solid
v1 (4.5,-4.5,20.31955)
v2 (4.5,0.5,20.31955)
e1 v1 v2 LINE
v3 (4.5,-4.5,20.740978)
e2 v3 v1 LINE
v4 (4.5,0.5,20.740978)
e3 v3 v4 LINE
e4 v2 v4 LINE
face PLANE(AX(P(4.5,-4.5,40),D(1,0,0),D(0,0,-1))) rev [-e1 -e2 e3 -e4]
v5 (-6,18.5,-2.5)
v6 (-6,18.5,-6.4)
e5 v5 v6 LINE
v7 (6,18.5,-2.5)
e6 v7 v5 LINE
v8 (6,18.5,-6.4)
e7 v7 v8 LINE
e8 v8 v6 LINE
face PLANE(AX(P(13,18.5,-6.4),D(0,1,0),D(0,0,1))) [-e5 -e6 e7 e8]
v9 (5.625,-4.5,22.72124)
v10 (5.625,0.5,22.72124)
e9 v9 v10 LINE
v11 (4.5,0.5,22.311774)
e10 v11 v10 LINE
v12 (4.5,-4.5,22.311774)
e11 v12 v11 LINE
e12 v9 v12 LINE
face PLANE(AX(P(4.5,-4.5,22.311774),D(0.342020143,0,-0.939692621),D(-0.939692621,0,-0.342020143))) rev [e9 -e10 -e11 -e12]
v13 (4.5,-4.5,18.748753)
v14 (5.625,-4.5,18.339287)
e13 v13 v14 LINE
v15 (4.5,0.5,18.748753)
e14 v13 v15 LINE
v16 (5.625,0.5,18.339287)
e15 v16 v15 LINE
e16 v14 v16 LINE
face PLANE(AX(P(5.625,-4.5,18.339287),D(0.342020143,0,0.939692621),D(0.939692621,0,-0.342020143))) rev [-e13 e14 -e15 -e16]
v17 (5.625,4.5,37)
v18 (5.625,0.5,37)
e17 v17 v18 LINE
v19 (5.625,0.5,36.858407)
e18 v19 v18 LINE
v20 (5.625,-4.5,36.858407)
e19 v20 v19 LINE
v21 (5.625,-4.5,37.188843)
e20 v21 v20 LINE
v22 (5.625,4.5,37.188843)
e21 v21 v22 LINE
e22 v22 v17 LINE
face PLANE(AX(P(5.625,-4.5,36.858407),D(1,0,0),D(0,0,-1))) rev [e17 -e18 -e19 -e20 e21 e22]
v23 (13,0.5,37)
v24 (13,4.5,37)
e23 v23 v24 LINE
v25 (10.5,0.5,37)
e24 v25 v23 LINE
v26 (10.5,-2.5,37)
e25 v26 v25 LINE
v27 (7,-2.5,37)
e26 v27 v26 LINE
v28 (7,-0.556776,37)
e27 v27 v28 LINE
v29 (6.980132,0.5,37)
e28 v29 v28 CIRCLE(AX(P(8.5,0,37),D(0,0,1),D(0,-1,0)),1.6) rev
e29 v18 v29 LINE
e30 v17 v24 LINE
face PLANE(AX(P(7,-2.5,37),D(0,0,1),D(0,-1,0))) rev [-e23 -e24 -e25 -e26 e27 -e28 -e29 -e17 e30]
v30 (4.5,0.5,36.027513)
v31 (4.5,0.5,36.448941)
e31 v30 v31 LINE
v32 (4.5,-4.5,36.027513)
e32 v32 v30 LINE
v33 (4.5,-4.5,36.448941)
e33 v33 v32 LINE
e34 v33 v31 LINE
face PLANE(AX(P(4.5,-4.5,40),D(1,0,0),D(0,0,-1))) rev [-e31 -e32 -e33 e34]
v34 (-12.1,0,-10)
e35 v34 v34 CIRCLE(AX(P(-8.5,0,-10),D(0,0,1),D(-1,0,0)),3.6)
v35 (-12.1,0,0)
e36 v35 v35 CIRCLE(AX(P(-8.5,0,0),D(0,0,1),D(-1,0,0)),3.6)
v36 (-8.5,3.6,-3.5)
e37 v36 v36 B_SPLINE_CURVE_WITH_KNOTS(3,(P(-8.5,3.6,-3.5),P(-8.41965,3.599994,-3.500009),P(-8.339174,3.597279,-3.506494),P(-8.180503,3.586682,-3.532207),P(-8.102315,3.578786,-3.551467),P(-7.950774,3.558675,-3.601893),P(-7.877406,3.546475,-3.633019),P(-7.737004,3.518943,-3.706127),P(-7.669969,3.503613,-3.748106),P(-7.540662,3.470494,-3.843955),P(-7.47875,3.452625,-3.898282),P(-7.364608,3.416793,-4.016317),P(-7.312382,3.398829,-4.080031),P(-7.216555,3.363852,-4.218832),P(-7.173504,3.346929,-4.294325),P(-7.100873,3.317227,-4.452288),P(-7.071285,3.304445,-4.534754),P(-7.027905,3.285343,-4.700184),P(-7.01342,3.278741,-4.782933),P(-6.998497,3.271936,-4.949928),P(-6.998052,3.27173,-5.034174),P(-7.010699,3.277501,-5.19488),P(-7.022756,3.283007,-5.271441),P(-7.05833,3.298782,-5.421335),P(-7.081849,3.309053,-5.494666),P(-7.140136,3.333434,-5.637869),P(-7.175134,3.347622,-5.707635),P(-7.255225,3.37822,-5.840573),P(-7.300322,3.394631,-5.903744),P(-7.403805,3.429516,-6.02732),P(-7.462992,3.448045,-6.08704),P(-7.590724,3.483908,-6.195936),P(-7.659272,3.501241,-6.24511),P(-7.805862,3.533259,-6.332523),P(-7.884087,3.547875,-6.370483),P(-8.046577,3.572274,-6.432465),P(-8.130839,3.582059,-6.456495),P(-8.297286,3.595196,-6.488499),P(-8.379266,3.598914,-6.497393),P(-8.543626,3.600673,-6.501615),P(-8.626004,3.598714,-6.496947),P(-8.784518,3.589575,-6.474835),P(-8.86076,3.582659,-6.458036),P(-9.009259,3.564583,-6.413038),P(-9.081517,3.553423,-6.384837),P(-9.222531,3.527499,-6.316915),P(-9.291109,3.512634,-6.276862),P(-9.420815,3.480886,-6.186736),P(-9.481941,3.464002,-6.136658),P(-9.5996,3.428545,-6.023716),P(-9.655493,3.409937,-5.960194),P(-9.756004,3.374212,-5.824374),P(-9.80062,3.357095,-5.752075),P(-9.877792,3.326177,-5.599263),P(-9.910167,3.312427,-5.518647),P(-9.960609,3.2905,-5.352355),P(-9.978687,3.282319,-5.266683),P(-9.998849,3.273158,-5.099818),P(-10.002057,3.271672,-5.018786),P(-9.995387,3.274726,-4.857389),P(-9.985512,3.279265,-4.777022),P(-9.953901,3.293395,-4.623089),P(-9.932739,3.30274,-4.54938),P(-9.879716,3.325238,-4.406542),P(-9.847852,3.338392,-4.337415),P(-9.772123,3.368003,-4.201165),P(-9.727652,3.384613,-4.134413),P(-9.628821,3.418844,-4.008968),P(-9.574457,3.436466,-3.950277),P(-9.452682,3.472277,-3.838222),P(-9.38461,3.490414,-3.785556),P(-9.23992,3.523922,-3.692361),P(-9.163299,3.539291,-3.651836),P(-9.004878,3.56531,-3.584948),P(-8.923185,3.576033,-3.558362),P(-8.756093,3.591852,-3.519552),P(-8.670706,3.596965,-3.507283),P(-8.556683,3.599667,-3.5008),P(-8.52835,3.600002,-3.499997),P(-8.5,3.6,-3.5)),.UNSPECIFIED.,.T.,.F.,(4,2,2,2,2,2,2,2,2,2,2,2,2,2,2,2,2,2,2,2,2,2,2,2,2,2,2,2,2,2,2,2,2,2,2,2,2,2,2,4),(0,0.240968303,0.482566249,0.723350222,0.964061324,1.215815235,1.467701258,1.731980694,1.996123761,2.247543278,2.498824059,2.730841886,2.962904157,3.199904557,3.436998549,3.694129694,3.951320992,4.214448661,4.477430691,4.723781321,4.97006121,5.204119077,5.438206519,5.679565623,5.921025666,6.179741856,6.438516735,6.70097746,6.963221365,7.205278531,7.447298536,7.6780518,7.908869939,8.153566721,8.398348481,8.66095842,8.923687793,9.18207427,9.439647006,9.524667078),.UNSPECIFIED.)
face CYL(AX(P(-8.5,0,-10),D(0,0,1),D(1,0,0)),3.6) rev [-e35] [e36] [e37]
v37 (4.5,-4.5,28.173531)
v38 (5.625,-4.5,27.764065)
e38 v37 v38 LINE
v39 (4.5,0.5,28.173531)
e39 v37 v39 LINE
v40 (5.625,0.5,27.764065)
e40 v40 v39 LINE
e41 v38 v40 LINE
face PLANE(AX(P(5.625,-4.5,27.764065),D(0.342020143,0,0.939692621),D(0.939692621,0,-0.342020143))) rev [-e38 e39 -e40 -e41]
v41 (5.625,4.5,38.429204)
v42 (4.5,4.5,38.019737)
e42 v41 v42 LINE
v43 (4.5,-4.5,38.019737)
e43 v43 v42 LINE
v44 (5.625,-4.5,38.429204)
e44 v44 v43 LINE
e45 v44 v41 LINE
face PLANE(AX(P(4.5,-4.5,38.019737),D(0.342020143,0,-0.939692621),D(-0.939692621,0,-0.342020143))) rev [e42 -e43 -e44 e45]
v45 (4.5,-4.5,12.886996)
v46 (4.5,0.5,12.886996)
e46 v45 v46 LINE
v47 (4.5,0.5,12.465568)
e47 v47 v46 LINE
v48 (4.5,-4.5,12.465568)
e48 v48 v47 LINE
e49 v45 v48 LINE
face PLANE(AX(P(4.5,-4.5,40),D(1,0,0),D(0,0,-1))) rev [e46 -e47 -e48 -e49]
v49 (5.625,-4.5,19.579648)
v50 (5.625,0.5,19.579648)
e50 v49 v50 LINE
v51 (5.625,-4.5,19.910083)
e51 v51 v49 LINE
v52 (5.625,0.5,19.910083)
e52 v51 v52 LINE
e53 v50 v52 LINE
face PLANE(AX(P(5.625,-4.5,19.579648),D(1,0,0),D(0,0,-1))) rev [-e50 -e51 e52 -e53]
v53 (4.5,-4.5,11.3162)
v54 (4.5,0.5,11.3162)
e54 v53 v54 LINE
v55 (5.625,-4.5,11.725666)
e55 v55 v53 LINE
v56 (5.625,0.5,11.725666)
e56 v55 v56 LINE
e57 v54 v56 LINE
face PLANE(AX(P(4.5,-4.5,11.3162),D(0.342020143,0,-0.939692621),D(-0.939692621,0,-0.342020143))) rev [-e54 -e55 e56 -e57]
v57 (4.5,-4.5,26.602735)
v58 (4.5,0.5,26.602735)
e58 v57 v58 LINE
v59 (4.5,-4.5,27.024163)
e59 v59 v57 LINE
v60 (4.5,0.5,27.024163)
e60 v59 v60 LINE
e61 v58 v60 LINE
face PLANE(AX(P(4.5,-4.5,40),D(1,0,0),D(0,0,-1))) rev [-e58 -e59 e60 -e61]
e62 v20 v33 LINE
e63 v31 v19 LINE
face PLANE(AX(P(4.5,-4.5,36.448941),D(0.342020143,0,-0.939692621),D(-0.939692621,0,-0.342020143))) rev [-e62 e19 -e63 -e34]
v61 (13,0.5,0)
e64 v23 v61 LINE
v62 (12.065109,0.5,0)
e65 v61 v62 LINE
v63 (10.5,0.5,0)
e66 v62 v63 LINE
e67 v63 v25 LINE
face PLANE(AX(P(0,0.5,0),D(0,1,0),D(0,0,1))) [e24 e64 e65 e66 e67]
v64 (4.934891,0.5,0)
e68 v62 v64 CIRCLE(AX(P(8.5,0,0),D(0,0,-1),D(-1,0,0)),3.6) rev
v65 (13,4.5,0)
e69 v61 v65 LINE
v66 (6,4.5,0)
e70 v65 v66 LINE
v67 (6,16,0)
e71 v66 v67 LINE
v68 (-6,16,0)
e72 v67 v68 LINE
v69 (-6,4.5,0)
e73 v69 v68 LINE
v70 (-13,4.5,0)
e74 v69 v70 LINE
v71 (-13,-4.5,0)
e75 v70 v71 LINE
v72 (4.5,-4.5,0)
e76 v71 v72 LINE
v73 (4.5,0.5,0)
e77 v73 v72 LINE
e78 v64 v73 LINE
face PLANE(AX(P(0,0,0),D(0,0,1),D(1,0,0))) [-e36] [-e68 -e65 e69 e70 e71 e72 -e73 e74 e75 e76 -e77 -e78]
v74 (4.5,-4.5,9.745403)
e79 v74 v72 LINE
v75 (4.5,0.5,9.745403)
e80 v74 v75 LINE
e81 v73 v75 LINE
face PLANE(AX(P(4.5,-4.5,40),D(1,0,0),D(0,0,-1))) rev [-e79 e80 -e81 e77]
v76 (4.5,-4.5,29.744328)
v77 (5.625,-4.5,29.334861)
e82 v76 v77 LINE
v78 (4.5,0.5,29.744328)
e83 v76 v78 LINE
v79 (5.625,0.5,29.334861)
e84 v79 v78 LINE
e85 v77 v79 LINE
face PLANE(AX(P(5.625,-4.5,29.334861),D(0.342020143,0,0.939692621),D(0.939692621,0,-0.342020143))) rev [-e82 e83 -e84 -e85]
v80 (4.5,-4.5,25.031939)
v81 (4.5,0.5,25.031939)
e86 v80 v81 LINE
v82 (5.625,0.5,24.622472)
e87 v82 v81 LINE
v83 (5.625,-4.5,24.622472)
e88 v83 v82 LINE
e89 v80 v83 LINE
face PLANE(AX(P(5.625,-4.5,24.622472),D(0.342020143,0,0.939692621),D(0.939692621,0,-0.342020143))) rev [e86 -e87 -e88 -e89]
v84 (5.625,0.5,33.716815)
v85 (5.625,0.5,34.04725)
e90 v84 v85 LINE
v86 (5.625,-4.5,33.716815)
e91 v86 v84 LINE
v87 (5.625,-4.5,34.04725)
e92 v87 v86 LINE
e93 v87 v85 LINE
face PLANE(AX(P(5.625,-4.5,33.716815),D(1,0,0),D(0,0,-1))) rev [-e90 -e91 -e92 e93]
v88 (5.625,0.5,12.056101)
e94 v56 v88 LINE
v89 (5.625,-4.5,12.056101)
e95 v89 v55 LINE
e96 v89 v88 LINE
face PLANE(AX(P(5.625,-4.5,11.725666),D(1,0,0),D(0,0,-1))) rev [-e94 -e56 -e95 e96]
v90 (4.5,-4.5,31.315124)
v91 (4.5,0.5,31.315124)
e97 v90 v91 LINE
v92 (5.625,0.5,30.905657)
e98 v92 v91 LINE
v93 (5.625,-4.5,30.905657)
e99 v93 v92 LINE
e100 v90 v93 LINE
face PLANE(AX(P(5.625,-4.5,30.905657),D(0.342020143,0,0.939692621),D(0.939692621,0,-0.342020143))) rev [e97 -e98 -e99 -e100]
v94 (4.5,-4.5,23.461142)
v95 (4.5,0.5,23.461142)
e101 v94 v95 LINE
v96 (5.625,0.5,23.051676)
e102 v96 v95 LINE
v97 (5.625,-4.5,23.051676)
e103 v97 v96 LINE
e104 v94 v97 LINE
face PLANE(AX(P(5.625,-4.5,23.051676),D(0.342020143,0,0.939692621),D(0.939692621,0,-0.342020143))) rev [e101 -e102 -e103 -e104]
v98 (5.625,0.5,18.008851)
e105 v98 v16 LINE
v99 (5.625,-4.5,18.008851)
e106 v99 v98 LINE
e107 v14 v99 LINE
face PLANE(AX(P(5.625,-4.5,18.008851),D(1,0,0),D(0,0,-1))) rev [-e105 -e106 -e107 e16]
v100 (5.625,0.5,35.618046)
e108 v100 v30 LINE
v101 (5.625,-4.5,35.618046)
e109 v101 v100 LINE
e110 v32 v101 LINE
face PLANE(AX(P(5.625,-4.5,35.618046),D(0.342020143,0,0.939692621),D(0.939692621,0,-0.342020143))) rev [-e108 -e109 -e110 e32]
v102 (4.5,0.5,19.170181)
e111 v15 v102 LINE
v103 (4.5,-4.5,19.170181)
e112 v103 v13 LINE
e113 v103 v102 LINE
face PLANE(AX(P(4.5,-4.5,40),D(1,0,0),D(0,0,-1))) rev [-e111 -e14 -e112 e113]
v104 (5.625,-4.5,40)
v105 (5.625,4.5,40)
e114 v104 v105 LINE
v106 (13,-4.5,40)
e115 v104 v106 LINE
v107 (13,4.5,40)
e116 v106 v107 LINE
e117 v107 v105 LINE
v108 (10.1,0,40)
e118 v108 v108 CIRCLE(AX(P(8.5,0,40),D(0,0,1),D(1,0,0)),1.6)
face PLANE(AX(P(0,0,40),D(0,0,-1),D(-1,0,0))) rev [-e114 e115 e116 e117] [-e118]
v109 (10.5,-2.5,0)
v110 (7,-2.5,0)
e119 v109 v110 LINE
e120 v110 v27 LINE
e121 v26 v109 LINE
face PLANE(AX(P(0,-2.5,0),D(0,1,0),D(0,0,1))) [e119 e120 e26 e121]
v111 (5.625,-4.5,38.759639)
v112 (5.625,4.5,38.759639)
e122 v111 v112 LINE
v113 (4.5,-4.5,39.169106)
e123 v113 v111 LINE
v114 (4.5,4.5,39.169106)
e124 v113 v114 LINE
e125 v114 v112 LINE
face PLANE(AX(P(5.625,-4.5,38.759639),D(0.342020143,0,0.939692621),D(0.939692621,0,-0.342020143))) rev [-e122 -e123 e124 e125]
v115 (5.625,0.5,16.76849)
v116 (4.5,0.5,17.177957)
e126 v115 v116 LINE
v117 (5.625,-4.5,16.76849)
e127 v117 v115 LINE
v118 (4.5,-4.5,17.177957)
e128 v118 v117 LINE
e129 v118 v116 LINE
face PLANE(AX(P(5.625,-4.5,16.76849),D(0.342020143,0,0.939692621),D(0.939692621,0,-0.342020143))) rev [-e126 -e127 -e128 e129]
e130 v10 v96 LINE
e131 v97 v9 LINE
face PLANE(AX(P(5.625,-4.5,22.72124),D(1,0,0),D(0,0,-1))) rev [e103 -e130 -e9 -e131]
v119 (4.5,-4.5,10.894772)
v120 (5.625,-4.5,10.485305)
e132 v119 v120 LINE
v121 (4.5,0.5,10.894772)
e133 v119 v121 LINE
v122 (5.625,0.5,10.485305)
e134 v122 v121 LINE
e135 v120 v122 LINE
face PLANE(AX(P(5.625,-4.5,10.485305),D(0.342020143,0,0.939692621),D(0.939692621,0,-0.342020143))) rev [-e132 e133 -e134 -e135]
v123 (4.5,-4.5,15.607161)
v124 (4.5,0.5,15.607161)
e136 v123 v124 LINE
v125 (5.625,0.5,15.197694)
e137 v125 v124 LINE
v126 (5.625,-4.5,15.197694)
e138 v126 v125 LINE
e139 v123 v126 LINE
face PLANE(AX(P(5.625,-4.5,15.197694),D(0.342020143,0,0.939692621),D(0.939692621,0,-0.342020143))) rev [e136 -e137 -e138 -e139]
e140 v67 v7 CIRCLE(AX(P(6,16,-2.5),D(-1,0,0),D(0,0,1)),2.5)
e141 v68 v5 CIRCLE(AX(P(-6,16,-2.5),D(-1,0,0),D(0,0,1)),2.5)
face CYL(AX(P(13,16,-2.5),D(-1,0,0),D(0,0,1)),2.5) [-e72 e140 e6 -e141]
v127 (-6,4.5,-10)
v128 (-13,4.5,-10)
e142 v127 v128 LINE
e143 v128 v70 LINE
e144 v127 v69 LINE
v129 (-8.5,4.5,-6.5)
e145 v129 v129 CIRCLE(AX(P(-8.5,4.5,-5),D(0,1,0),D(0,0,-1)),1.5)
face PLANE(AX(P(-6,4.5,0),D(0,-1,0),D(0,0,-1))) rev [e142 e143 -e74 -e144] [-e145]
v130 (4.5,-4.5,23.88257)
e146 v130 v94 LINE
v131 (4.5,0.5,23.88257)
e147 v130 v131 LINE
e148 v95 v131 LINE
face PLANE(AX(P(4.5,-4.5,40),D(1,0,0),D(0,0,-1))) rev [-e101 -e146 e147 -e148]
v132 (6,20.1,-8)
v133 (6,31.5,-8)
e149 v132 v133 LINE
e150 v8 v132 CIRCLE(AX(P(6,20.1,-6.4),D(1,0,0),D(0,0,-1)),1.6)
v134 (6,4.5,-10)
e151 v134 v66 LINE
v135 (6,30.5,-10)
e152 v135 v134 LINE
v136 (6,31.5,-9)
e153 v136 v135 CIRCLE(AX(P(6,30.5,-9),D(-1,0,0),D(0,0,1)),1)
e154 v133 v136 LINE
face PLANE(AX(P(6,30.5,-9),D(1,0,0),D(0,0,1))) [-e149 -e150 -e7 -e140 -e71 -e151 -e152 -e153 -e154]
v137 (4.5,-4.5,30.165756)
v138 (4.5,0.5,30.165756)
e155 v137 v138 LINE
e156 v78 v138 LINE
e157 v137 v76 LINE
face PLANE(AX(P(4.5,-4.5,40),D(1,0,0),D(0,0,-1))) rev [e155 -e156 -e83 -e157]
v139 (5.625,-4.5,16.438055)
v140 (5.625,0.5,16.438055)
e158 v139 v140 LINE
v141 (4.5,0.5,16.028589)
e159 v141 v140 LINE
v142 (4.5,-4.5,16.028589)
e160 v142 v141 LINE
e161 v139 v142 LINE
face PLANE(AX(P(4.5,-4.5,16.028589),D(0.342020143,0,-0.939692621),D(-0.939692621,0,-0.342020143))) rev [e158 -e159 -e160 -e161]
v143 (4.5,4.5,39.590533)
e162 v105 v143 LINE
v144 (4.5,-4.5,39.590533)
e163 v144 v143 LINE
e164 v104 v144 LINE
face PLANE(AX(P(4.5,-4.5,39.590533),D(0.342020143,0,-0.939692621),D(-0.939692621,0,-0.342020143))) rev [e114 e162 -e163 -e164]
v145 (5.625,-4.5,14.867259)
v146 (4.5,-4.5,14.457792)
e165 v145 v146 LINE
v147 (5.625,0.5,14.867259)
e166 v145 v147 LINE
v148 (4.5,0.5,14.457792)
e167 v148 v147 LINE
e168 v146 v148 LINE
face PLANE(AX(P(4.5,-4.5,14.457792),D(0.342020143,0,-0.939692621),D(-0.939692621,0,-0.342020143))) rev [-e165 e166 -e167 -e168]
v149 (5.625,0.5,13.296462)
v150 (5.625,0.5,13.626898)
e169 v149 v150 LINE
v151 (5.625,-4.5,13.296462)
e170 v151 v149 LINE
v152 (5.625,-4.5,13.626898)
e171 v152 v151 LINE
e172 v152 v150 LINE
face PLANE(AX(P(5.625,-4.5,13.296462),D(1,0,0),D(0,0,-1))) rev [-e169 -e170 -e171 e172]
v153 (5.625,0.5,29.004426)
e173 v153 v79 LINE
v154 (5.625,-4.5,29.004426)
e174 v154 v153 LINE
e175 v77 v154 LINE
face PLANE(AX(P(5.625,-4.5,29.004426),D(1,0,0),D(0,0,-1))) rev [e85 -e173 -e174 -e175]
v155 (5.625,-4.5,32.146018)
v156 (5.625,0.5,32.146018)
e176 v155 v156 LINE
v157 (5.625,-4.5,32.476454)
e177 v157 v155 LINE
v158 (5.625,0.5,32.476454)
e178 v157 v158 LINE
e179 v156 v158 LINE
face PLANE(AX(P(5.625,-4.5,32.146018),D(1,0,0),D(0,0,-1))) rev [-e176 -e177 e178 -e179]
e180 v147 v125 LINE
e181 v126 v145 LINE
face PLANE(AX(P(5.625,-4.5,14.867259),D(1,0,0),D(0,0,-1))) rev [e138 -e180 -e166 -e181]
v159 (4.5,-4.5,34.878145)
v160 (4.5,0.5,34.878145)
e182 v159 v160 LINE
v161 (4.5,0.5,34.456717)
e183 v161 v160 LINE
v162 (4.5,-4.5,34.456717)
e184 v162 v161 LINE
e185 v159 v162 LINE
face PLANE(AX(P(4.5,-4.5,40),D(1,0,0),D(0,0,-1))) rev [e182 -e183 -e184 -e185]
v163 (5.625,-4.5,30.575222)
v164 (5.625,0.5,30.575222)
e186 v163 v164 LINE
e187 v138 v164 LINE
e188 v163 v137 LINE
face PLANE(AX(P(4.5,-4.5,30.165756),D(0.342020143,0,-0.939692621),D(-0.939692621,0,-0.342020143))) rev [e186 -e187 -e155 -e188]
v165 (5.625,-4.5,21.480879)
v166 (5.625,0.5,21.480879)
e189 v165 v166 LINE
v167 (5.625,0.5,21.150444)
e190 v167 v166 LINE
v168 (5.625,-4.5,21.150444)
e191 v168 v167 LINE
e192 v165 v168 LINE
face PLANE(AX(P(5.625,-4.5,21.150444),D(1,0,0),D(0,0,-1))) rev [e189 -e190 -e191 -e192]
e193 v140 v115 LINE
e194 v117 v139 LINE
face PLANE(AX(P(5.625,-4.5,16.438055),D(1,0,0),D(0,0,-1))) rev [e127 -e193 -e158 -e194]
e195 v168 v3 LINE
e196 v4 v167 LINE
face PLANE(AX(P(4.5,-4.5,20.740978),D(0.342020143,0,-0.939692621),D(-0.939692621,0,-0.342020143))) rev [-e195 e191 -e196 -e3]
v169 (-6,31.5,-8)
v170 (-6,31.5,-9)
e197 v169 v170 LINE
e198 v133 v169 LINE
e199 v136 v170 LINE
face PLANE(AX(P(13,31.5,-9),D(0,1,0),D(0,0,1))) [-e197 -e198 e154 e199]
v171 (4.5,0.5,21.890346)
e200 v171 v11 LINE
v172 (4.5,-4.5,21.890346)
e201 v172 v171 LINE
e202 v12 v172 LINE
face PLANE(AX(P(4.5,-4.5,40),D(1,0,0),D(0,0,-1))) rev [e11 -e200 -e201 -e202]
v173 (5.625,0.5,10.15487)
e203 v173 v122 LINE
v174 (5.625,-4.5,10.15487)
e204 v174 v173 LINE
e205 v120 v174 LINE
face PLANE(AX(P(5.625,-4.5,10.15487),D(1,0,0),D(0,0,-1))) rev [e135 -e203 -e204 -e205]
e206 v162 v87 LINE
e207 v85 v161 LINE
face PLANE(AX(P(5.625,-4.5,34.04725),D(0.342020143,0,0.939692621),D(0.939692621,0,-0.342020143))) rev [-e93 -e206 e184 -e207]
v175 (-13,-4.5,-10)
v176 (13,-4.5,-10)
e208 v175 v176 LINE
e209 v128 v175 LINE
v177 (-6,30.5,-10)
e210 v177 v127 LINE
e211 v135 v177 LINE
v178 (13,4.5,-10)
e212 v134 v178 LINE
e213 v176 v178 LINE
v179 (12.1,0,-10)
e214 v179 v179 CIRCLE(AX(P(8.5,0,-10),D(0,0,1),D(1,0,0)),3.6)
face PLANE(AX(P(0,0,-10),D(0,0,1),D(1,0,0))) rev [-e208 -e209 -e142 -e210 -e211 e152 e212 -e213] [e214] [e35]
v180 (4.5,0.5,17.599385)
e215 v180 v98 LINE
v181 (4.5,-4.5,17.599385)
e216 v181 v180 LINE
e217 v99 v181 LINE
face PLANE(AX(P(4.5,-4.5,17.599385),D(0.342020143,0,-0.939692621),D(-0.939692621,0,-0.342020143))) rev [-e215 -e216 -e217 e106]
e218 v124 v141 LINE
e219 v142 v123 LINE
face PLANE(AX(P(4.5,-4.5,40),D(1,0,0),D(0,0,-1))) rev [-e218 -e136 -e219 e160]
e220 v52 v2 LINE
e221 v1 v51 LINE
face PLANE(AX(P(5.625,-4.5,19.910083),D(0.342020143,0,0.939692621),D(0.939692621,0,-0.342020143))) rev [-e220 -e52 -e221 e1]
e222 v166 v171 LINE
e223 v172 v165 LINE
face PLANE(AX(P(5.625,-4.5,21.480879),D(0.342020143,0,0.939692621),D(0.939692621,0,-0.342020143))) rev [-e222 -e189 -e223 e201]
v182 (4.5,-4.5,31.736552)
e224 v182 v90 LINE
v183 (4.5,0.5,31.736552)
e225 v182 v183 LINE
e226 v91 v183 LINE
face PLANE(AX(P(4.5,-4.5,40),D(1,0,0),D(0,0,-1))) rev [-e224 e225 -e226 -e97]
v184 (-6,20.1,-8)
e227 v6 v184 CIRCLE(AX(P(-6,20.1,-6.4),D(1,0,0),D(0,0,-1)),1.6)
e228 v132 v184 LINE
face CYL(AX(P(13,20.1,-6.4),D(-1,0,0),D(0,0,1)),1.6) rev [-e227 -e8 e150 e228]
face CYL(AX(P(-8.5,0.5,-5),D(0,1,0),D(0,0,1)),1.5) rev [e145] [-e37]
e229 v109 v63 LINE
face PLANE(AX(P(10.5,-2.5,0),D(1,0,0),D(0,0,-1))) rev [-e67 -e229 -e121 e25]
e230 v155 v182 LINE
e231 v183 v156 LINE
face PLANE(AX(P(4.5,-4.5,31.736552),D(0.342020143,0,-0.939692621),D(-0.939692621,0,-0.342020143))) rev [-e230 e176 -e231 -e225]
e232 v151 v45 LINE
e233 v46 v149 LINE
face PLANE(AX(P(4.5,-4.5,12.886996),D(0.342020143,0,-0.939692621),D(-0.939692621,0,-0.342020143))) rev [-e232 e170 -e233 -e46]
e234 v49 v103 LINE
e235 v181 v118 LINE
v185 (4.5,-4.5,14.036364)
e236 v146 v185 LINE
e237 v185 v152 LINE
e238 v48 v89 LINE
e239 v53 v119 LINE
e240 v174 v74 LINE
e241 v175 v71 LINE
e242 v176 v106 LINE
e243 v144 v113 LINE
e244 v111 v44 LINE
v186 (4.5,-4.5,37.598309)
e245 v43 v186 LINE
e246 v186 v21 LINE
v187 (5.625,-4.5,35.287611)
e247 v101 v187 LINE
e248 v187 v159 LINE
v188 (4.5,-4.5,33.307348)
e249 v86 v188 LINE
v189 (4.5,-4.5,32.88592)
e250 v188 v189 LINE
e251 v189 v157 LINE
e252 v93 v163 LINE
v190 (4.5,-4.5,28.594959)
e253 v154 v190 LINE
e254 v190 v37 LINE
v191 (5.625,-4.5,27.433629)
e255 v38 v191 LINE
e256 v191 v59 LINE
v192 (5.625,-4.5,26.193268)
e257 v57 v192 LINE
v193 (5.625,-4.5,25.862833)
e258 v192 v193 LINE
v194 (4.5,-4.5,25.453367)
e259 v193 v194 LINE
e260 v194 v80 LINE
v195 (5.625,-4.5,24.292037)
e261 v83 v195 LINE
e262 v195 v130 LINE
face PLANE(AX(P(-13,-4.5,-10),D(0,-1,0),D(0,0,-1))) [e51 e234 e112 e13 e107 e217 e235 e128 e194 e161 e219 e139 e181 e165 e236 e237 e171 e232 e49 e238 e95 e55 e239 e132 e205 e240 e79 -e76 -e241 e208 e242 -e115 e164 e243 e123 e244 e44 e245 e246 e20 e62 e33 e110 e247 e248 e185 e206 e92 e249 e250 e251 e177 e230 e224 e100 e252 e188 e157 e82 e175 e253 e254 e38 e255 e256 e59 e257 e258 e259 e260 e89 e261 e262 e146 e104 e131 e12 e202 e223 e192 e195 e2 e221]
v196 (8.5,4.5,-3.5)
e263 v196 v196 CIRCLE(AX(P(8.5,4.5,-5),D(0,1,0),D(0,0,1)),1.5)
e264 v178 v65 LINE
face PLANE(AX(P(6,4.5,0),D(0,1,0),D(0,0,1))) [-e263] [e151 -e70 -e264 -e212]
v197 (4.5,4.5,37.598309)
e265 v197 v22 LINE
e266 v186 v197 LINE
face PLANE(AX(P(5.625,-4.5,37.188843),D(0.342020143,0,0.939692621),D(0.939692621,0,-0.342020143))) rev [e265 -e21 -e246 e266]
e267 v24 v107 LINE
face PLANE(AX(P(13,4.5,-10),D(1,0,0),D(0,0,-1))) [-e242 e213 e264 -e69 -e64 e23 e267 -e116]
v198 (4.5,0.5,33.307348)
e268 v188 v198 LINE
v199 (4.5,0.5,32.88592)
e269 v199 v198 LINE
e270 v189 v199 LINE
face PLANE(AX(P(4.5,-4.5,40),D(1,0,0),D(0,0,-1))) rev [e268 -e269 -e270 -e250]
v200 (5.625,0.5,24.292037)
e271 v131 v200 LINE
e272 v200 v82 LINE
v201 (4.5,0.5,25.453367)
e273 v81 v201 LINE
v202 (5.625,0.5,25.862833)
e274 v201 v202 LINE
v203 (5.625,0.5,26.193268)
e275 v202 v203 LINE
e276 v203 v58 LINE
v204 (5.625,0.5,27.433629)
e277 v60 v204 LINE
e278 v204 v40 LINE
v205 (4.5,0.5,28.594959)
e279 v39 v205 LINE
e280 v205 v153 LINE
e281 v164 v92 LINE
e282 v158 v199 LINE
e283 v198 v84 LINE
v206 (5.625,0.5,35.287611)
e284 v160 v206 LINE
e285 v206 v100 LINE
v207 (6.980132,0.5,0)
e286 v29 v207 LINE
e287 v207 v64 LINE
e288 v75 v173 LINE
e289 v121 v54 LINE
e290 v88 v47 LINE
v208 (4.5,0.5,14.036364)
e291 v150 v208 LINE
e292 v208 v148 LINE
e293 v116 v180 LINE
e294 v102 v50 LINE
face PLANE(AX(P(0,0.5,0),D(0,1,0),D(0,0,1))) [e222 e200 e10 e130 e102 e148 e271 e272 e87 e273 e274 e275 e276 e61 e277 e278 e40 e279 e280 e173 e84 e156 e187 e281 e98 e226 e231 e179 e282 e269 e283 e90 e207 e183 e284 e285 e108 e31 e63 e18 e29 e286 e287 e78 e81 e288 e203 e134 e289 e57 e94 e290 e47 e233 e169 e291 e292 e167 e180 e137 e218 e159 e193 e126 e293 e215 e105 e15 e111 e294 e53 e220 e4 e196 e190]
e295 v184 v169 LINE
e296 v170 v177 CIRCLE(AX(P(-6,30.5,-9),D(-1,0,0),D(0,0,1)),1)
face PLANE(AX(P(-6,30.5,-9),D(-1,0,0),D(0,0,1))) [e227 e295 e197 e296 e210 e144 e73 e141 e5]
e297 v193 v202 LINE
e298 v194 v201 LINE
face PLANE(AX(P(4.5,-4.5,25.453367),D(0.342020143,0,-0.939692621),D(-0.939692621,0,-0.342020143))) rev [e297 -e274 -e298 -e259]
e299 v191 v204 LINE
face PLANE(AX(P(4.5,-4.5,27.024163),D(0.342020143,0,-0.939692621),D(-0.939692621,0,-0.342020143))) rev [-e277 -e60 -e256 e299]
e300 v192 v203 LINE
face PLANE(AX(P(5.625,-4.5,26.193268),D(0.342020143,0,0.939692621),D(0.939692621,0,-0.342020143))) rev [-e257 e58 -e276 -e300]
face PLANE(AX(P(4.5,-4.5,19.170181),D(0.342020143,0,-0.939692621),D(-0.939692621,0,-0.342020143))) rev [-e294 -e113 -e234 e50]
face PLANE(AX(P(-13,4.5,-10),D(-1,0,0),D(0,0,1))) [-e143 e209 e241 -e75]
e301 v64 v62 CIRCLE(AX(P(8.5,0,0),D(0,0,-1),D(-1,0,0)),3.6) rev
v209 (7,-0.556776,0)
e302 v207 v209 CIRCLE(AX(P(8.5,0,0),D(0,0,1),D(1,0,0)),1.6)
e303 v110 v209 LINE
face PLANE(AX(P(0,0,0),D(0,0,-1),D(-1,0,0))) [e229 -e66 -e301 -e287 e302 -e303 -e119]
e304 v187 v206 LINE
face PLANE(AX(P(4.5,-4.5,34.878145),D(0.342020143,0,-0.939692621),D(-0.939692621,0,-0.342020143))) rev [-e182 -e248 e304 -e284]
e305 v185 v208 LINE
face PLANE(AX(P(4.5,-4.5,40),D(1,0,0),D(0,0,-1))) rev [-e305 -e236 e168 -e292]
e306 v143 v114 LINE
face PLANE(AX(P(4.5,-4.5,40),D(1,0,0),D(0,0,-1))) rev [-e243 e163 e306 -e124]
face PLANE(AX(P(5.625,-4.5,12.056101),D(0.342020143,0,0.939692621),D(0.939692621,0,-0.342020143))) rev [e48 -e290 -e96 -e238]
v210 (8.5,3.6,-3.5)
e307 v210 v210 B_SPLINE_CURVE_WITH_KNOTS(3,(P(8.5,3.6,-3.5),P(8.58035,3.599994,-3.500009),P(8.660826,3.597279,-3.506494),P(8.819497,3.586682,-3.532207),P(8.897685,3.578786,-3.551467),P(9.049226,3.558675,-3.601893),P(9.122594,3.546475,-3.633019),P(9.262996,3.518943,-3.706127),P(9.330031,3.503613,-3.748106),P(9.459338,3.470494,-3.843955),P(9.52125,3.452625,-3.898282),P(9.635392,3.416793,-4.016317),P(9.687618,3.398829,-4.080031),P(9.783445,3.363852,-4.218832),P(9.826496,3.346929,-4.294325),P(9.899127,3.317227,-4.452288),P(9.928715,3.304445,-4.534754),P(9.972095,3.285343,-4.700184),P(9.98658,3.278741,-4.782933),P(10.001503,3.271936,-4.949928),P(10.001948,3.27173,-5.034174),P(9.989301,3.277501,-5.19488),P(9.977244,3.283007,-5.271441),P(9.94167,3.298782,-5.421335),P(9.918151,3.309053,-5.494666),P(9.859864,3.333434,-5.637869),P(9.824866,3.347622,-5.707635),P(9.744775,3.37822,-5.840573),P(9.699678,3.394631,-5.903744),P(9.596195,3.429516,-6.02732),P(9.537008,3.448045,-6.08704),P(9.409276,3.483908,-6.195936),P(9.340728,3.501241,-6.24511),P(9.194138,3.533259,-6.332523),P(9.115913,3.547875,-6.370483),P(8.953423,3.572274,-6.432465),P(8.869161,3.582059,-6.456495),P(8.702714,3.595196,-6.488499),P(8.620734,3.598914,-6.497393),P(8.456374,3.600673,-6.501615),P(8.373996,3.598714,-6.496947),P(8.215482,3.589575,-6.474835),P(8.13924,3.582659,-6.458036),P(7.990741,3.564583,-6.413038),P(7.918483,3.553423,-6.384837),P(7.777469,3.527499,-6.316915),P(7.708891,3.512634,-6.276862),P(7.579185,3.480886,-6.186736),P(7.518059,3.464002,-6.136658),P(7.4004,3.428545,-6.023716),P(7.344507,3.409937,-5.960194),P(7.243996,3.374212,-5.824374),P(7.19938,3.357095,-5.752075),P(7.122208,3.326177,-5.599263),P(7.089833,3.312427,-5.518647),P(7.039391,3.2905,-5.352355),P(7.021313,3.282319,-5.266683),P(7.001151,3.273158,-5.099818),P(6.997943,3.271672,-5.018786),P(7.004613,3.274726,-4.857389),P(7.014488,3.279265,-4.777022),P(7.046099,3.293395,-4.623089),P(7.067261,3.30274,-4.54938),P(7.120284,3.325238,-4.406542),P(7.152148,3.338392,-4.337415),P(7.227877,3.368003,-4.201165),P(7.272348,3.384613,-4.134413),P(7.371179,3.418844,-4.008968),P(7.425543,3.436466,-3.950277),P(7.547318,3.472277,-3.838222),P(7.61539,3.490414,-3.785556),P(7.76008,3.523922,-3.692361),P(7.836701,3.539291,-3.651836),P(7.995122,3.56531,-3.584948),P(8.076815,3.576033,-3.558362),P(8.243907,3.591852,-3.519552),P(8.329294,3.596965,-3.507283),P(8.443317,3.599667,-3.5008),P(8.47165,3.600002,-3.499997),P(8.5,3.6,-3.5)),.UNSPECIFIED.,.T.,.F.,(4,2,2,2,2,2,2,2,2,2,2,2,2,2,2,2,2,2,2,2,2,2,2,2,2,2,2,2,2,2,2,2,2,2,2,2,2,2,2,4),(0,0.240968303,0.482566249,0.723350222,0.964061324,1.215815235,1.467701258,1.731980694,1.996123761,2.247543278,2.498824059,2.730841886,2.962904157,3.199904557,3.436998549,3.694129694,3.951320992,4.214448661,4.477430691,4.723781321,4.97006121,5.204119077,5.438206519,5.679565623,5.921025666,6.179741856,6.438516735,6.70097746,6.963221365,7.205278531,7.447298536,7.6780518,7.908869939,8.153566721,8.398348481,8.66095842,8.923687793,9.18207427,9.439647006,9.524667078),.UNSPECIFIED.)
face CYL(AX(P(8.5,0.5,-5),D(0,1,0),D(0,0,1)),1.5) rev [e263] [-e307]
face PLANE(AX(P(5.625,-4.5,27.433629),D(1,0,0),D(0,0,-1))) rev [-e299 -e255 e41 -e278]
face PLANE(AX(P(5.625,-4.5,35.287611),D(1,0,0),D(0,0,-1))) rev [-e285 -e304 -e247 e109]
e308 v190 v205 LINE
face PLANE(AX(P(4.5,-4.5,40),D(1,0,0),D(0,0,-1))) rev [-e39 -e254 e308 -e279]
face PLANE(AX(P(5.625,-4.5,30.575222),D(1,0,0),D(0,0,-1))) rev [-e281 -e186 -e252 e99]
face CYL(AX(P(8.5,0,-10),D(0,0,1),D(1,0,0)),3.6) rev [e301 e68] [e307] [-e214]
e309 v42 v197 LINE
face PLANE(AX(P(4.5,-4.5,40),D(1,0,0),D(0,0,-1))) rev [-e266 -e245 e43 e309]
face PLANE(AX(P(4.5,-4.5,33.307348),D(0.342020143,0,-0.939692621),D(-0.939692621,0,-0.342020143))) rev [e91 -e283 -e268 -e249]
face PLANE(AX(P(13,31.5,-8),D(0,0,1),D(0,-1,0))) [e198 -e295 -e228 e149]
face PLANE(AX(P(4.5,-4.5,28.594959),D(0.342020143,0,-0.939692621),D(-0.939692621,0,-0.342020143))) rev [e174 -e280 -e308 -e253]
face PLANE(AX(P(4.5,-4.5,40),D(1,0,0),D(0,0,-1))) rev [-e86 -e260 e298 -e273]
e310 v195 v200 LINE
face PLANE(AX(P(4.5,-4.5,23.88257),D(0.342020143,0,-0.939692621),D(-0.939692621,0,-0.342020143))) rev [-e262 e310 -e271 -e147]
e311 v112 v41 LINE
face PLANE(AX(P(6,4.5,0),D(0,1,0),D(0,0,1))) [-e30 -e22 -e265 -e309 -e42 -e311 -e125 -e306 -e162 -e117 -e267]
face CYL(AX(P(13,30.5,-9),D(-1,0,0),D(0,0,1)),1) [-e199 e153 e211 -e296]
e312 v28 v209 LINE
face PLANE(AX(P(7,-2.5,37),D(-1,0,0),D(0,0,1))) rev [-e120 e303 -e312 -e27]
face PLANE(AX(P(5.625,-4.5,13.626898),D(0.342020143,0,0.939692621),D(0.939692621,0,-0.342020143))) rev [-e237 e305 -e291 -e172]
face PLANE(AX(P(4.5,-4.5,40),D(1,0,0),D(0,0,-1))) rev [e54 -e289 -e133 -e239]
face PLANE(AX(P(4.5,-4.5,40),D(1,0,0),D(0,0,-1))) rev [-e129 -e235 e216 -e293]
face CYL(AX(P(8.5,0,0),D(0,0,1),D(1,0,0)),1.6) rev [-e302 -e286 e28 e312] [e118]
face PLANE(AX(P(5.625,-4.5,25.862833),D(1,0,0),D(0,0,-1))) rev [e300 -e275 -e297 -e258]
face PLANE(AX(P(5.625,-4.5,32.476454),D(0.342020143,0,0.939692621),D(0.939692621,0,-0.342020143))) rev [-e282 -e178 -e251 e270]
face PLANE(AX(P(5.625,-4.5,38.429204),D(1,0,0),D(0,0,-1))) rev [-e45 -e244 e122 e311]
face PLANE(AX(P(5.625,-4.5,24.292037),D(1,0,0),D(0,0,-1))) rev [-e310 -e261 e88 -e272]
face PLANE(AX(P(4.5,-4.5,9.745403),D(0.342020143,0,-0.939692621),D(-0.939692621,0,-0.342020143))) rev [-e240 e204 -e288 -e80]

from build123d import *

# Parameters (mm, degrees)
SKETCH_1_W             = 26
SKETCH_1_H             = 9
EXTRUDE_1_DEPTH        = 10
SKETCH_2_R             = 3.6
CUT_EXTRUDE_1_DEPTH    = 18.007351352
EXTRUDE_2_DEPTH        = 26
CUT_EXTRUDE_2_DEPTH    = 7
SKETCH_7_W             = 8.5
SKETCH_7_H             = 9
EXTRUDE_3_DEPTH        = 40
SKETCH_8_R             = 1.6
CUT_EXTRUDE_3_DEPTH    = 40
SKETCH_9_W             = 3.5
SKETCH_9_H             = 37
CUT_EXTRUDE_4_DEPTH    = 7
CUT_EXTRUDE_12_DEPTH   = 50.979995998
PATTERN_START          = -4.5
PATTERN_LINEAR_2_DEPTH = 9
SKETCH_22_W            = 8.5
SKETCH_22_H            = 37
CUT_EXTRUDE_13_DEPTH   = 4
SKETCH_23_R            = 1.5
CUT_EXTRUDE_14_DEPTH   = 4


# Read off the part's stored shape, not the designer's step: 阵列(线性)2
with BuildPart() as part:
    # 草图1 → 凸台-拉伸1 (new body)
    with BuildSketch(Plane.XY):
        Rectangle(SKETCH_1_W, SKETCH_1_H)
    extrude(amount=-EXTRUDE_1_DEPTH)

    # 草图2 → 切除-拉伸1 (cut, through all)
    with BuildSketch(Plane.XY):
        with Locations((8.5, 0)):
            Circle(SKETCH_2_R)
        with Locations(Location((-8.5, 0, 0), (0, 0, 180))):
            Circle(SKETCH_2_R)
    extrude(amount=-CUT_EXTRUDE_1_DEPTH, mode=Mode.SUBTRACT)

    # 草图5 → 凸台-拉伸2 (add, through all)
    with BuildSketch(Plane.ZY.offset(13)):
        with BuildLine():
            Line((0, 4.5), (-10, 4.5))
            Line((-10, 4.5), (-10, 8.301419967))
            Line((-10, 8.301419967), (-10, 30.5))
            ThreePointArc((-10, 30.5), (-9.707106781, 31.207106781), (-9, 31.5))
            Line((-9, 31.5), (-8, 31.5))
            Line((-8, 31.5), (-8, 20.1))
            ThreePointArc((-8, 20.1), (-7.53137085, 18.96862915), (-6.4, 18.5))
            Line((-6.4, 18.5), (-2.5, 18.5))
            ThreePointArc((-2.5, 18.5), (-0.732233047, 17.767766953), (0, 16))
            Line((0, 16), (0, 4.5))
        make_face()
    extrude(amount=-EXTRUDE_2_DEPTH)

    # 草图5<2> → 切除-拉伸2 (cut)
    with BuildSketch(Plane.ZY.offset(13)):
        with BuildLine():
            Line((0, 4.5), (-10, 4.5))
            Line((-10, 4.5), (-10, 8.301419967))
            Line((-10, 8.301419967), (-10, 30.5))
            ThreePointArc((-10, 30.5), (-9.707106781, 31.207106781), (-9, 31.5))
            Line((-9, 31.5), (-8, 31.5))
            Line((-8, 31.5), (-8, 20.1))
            ThreePointArc((-8, 20.1), (-7.53137085, 18.96862915), (-6.4, 18.5))
            Line((-6.4, 18.5), (-2.5, 18.5))
            ThreePointArc((-2.5, 18.5), (-0.732233047, 17.767766953), (0, 16))
            Line((0, 16), (0, 4.5))
        make_face()
    cut_extrude_2 = extrude(amount=-CUT_EXTRUDE_2_DEPTH, mode=Mode.SUBTRACT)

    # 镜向1: 切除-拉伸2 across plane
    add(cut_extrude_2.mirror(Plane(origin=(0, 0, 0), x_dir=(0, 0, 1), z_dir=(1, 0, 0))), mode=Mode.SUBTRACT)

    # 草图7 → 凸台-拉伸3 (add)
    with BuildSketch(Plane.XY):
        with Locations((8.75, 0)):
            Rectangle(SKETCH_7_W, SKETCH_7_H)
    extrude(amount=EXTRUDE_3_DEPTH)

    # 草图8 → 切除-拉伸3 (cut)
    with BuildSketch(Plane.XY.offset(40)):
        with Locations((8.5, 0)):
            Circle(SKETCH_8_R)
    extrude(amount=-CUT_EXTRUDE_3_DEPTH, mode=Mode.SUBTRACT)

    # 草图9 → 切除-拉伸4 (cut)
    with BuildSketch(Plane(origin=(0, 4.5, 0), x_dir=(1, 0, 0), z_dir=(0, 1, 0))):
        with Locations((8.75, -18.5)):
            Rectangle(SKETCH_9_W, SKETCH_9_H)
    extrude(amount=-CUT_EXTRUDE_4_DEPTH, mode=Mode.SUBTRACT)

    # 草图10 → 切除-拉伸12 (cut, through all)
    with BuildSketch(Plane(origin=(0, 4.5, 0), x_dir=(1, 0, 0), z_dir=(0, 1, 0))):
        Polygon((5.625, -40), (5.625, -40.330435371), (4.5, -40.739901884), (4.5, -39.590533486), align=None)
    extrude(amount=-CUT_EXTRUDE_12_DEPTH, mode=Mode.SUBTRACT)

    # 阵列(线性)2 outline → 阵列(线性)2 (cut)
    with BuildSketch(Plane(origin=(0, 0, 0), x_dir=(1, 0, 0), z_dir=(0, 1, 0)).offset(PATTERN_START)):
        Polygon((5.625, -10.485305161), (5.625, -10.154869791), (4.5, -9.745403277), (4.5, -10.894771675), align=None)
        Polygon((5.625, -38.429203673), (4.5, -38.01973716), (4.5, -39.169105557), (5.625, -38.759639044), align=None)
        Polygon((5.625, -36.858407346), (4.5, -36.448940833), (4.5, -37.598309231), (5.625, -37.188842717), align=None)
        Polygon((5.625, -35.28761102), (4.5, -34.878144506), (4.5, -36.027512904), (5.625, -35.61804639), align=None)
        Polygon((5.625, -33.716814693), (4.5, -33.307348179), (4.5, -34.456716577), (5.625, -34.047250063), align=None)
        Polygon((5.625, -32.146018366), (4.5, -31.736551852), (4.5, -32.88592025), (5.625, -32.476453737), align=None)
        Polygon((5.625, -30.575222039), (4.5, -30.165755526), (4.5, -31.315123923), (5.625, -30.90565741), align=None)
        Polygon((5.625, -29.004425712), (4.5, -28.594959199), (4.5, -29.744327597), (5.625, -29.334861083), align=None)
        Polygon((5.625, -27.433629386), (4.5, -27.024162872), (4.5, -28.17353127), (5.625, -27.764064756), align=None)
        Polygon((5.625, -25.862833059), (4.5, -25.453366545), (4.5, -26.602734943), (5.625, -26.193268429), align=None)
        Polygon((5.625, -24.292036732), (4.5, -23.882570219), (4.5, -25.031938616), (5.625, -24.622472103), align=None)
        Polygon((5.625, -22.721240405), (4.5, -22.311773892), (4.5, -23.461142289), (5.625, -23.051675776), align=None)
        Polygon((5.625, -21.150444078), (4.5, -20.740977565), (4.5, -21.890345963), (5.625, -21.480879449), align=None)
        Polygon((5.625, -19.579647752), (4.5, -19.170181238), (4.5, -20.319549636), (5.625, -19.910083122), align=None)
        Polygon((5.625, -18.008851425), (4.5, -17.599384911), (4.5, -18.748753309), (5.625, -18.339286795), align=None)
        Polygon((5.625, -16.438055098), (4.5, -16.028588585), (4.5, -17.177956982), (5.625, -16.768490469), align=None)
        Polygon((5.625, -14.867258771), (4.5, -14.457792258), (4.5, -15.607160655), (5.625, -15.197694142), align=None)
        Polygon((5.625, -13.296462444), (4.5, -12.886995931), (4.5, -14.036364329), (5.625, -13.626897815), align=None)
        Polygon((5.625, -11.725666118), (4.5, -11.316199604), (4.5, -12.465568002), (5.625, -12.056101488), align=None)
    extrude(amount=PATTERN_LINEAR_2_DEPTH, mode=Mode.SUBTRACT)

    # 草图22 → 切除-拉伸13 (cut)
    with BuildSketch(Plane(origin=(0, 4.5, 0), x_dir=(1, 0, 0), z_dir=(0, 1, 0))):
        with Locations((8.75, -18.5)):
            Rectangle(SKETCH_22_W, SKETCH_22_H)
    extrude(amount=-CUT_EXTRUDE_13_DEPTH, mode=Mode.SUBTRACT)

    # 草图23 → 切除-拉伸14 (cut)
    with BuildSketch(Plane(origin=(0, 4.5, 0), x_dir=(1, 0, 0), z_dir=(0, 1, 0))):
        with Locations(Location((8.5, 5, 0), (0, 0, 270))):
            Circle(SKETCH_23_R)
        with Locations(Location((-8.5, 5, 0), (0, 0, 270))):
            Circle(SKETCH_23_R)
    extrude(amount=-CUT_EXTRUDE_14_DEPTH, mode=Mode.SUBTRACT)


solid = part.part
